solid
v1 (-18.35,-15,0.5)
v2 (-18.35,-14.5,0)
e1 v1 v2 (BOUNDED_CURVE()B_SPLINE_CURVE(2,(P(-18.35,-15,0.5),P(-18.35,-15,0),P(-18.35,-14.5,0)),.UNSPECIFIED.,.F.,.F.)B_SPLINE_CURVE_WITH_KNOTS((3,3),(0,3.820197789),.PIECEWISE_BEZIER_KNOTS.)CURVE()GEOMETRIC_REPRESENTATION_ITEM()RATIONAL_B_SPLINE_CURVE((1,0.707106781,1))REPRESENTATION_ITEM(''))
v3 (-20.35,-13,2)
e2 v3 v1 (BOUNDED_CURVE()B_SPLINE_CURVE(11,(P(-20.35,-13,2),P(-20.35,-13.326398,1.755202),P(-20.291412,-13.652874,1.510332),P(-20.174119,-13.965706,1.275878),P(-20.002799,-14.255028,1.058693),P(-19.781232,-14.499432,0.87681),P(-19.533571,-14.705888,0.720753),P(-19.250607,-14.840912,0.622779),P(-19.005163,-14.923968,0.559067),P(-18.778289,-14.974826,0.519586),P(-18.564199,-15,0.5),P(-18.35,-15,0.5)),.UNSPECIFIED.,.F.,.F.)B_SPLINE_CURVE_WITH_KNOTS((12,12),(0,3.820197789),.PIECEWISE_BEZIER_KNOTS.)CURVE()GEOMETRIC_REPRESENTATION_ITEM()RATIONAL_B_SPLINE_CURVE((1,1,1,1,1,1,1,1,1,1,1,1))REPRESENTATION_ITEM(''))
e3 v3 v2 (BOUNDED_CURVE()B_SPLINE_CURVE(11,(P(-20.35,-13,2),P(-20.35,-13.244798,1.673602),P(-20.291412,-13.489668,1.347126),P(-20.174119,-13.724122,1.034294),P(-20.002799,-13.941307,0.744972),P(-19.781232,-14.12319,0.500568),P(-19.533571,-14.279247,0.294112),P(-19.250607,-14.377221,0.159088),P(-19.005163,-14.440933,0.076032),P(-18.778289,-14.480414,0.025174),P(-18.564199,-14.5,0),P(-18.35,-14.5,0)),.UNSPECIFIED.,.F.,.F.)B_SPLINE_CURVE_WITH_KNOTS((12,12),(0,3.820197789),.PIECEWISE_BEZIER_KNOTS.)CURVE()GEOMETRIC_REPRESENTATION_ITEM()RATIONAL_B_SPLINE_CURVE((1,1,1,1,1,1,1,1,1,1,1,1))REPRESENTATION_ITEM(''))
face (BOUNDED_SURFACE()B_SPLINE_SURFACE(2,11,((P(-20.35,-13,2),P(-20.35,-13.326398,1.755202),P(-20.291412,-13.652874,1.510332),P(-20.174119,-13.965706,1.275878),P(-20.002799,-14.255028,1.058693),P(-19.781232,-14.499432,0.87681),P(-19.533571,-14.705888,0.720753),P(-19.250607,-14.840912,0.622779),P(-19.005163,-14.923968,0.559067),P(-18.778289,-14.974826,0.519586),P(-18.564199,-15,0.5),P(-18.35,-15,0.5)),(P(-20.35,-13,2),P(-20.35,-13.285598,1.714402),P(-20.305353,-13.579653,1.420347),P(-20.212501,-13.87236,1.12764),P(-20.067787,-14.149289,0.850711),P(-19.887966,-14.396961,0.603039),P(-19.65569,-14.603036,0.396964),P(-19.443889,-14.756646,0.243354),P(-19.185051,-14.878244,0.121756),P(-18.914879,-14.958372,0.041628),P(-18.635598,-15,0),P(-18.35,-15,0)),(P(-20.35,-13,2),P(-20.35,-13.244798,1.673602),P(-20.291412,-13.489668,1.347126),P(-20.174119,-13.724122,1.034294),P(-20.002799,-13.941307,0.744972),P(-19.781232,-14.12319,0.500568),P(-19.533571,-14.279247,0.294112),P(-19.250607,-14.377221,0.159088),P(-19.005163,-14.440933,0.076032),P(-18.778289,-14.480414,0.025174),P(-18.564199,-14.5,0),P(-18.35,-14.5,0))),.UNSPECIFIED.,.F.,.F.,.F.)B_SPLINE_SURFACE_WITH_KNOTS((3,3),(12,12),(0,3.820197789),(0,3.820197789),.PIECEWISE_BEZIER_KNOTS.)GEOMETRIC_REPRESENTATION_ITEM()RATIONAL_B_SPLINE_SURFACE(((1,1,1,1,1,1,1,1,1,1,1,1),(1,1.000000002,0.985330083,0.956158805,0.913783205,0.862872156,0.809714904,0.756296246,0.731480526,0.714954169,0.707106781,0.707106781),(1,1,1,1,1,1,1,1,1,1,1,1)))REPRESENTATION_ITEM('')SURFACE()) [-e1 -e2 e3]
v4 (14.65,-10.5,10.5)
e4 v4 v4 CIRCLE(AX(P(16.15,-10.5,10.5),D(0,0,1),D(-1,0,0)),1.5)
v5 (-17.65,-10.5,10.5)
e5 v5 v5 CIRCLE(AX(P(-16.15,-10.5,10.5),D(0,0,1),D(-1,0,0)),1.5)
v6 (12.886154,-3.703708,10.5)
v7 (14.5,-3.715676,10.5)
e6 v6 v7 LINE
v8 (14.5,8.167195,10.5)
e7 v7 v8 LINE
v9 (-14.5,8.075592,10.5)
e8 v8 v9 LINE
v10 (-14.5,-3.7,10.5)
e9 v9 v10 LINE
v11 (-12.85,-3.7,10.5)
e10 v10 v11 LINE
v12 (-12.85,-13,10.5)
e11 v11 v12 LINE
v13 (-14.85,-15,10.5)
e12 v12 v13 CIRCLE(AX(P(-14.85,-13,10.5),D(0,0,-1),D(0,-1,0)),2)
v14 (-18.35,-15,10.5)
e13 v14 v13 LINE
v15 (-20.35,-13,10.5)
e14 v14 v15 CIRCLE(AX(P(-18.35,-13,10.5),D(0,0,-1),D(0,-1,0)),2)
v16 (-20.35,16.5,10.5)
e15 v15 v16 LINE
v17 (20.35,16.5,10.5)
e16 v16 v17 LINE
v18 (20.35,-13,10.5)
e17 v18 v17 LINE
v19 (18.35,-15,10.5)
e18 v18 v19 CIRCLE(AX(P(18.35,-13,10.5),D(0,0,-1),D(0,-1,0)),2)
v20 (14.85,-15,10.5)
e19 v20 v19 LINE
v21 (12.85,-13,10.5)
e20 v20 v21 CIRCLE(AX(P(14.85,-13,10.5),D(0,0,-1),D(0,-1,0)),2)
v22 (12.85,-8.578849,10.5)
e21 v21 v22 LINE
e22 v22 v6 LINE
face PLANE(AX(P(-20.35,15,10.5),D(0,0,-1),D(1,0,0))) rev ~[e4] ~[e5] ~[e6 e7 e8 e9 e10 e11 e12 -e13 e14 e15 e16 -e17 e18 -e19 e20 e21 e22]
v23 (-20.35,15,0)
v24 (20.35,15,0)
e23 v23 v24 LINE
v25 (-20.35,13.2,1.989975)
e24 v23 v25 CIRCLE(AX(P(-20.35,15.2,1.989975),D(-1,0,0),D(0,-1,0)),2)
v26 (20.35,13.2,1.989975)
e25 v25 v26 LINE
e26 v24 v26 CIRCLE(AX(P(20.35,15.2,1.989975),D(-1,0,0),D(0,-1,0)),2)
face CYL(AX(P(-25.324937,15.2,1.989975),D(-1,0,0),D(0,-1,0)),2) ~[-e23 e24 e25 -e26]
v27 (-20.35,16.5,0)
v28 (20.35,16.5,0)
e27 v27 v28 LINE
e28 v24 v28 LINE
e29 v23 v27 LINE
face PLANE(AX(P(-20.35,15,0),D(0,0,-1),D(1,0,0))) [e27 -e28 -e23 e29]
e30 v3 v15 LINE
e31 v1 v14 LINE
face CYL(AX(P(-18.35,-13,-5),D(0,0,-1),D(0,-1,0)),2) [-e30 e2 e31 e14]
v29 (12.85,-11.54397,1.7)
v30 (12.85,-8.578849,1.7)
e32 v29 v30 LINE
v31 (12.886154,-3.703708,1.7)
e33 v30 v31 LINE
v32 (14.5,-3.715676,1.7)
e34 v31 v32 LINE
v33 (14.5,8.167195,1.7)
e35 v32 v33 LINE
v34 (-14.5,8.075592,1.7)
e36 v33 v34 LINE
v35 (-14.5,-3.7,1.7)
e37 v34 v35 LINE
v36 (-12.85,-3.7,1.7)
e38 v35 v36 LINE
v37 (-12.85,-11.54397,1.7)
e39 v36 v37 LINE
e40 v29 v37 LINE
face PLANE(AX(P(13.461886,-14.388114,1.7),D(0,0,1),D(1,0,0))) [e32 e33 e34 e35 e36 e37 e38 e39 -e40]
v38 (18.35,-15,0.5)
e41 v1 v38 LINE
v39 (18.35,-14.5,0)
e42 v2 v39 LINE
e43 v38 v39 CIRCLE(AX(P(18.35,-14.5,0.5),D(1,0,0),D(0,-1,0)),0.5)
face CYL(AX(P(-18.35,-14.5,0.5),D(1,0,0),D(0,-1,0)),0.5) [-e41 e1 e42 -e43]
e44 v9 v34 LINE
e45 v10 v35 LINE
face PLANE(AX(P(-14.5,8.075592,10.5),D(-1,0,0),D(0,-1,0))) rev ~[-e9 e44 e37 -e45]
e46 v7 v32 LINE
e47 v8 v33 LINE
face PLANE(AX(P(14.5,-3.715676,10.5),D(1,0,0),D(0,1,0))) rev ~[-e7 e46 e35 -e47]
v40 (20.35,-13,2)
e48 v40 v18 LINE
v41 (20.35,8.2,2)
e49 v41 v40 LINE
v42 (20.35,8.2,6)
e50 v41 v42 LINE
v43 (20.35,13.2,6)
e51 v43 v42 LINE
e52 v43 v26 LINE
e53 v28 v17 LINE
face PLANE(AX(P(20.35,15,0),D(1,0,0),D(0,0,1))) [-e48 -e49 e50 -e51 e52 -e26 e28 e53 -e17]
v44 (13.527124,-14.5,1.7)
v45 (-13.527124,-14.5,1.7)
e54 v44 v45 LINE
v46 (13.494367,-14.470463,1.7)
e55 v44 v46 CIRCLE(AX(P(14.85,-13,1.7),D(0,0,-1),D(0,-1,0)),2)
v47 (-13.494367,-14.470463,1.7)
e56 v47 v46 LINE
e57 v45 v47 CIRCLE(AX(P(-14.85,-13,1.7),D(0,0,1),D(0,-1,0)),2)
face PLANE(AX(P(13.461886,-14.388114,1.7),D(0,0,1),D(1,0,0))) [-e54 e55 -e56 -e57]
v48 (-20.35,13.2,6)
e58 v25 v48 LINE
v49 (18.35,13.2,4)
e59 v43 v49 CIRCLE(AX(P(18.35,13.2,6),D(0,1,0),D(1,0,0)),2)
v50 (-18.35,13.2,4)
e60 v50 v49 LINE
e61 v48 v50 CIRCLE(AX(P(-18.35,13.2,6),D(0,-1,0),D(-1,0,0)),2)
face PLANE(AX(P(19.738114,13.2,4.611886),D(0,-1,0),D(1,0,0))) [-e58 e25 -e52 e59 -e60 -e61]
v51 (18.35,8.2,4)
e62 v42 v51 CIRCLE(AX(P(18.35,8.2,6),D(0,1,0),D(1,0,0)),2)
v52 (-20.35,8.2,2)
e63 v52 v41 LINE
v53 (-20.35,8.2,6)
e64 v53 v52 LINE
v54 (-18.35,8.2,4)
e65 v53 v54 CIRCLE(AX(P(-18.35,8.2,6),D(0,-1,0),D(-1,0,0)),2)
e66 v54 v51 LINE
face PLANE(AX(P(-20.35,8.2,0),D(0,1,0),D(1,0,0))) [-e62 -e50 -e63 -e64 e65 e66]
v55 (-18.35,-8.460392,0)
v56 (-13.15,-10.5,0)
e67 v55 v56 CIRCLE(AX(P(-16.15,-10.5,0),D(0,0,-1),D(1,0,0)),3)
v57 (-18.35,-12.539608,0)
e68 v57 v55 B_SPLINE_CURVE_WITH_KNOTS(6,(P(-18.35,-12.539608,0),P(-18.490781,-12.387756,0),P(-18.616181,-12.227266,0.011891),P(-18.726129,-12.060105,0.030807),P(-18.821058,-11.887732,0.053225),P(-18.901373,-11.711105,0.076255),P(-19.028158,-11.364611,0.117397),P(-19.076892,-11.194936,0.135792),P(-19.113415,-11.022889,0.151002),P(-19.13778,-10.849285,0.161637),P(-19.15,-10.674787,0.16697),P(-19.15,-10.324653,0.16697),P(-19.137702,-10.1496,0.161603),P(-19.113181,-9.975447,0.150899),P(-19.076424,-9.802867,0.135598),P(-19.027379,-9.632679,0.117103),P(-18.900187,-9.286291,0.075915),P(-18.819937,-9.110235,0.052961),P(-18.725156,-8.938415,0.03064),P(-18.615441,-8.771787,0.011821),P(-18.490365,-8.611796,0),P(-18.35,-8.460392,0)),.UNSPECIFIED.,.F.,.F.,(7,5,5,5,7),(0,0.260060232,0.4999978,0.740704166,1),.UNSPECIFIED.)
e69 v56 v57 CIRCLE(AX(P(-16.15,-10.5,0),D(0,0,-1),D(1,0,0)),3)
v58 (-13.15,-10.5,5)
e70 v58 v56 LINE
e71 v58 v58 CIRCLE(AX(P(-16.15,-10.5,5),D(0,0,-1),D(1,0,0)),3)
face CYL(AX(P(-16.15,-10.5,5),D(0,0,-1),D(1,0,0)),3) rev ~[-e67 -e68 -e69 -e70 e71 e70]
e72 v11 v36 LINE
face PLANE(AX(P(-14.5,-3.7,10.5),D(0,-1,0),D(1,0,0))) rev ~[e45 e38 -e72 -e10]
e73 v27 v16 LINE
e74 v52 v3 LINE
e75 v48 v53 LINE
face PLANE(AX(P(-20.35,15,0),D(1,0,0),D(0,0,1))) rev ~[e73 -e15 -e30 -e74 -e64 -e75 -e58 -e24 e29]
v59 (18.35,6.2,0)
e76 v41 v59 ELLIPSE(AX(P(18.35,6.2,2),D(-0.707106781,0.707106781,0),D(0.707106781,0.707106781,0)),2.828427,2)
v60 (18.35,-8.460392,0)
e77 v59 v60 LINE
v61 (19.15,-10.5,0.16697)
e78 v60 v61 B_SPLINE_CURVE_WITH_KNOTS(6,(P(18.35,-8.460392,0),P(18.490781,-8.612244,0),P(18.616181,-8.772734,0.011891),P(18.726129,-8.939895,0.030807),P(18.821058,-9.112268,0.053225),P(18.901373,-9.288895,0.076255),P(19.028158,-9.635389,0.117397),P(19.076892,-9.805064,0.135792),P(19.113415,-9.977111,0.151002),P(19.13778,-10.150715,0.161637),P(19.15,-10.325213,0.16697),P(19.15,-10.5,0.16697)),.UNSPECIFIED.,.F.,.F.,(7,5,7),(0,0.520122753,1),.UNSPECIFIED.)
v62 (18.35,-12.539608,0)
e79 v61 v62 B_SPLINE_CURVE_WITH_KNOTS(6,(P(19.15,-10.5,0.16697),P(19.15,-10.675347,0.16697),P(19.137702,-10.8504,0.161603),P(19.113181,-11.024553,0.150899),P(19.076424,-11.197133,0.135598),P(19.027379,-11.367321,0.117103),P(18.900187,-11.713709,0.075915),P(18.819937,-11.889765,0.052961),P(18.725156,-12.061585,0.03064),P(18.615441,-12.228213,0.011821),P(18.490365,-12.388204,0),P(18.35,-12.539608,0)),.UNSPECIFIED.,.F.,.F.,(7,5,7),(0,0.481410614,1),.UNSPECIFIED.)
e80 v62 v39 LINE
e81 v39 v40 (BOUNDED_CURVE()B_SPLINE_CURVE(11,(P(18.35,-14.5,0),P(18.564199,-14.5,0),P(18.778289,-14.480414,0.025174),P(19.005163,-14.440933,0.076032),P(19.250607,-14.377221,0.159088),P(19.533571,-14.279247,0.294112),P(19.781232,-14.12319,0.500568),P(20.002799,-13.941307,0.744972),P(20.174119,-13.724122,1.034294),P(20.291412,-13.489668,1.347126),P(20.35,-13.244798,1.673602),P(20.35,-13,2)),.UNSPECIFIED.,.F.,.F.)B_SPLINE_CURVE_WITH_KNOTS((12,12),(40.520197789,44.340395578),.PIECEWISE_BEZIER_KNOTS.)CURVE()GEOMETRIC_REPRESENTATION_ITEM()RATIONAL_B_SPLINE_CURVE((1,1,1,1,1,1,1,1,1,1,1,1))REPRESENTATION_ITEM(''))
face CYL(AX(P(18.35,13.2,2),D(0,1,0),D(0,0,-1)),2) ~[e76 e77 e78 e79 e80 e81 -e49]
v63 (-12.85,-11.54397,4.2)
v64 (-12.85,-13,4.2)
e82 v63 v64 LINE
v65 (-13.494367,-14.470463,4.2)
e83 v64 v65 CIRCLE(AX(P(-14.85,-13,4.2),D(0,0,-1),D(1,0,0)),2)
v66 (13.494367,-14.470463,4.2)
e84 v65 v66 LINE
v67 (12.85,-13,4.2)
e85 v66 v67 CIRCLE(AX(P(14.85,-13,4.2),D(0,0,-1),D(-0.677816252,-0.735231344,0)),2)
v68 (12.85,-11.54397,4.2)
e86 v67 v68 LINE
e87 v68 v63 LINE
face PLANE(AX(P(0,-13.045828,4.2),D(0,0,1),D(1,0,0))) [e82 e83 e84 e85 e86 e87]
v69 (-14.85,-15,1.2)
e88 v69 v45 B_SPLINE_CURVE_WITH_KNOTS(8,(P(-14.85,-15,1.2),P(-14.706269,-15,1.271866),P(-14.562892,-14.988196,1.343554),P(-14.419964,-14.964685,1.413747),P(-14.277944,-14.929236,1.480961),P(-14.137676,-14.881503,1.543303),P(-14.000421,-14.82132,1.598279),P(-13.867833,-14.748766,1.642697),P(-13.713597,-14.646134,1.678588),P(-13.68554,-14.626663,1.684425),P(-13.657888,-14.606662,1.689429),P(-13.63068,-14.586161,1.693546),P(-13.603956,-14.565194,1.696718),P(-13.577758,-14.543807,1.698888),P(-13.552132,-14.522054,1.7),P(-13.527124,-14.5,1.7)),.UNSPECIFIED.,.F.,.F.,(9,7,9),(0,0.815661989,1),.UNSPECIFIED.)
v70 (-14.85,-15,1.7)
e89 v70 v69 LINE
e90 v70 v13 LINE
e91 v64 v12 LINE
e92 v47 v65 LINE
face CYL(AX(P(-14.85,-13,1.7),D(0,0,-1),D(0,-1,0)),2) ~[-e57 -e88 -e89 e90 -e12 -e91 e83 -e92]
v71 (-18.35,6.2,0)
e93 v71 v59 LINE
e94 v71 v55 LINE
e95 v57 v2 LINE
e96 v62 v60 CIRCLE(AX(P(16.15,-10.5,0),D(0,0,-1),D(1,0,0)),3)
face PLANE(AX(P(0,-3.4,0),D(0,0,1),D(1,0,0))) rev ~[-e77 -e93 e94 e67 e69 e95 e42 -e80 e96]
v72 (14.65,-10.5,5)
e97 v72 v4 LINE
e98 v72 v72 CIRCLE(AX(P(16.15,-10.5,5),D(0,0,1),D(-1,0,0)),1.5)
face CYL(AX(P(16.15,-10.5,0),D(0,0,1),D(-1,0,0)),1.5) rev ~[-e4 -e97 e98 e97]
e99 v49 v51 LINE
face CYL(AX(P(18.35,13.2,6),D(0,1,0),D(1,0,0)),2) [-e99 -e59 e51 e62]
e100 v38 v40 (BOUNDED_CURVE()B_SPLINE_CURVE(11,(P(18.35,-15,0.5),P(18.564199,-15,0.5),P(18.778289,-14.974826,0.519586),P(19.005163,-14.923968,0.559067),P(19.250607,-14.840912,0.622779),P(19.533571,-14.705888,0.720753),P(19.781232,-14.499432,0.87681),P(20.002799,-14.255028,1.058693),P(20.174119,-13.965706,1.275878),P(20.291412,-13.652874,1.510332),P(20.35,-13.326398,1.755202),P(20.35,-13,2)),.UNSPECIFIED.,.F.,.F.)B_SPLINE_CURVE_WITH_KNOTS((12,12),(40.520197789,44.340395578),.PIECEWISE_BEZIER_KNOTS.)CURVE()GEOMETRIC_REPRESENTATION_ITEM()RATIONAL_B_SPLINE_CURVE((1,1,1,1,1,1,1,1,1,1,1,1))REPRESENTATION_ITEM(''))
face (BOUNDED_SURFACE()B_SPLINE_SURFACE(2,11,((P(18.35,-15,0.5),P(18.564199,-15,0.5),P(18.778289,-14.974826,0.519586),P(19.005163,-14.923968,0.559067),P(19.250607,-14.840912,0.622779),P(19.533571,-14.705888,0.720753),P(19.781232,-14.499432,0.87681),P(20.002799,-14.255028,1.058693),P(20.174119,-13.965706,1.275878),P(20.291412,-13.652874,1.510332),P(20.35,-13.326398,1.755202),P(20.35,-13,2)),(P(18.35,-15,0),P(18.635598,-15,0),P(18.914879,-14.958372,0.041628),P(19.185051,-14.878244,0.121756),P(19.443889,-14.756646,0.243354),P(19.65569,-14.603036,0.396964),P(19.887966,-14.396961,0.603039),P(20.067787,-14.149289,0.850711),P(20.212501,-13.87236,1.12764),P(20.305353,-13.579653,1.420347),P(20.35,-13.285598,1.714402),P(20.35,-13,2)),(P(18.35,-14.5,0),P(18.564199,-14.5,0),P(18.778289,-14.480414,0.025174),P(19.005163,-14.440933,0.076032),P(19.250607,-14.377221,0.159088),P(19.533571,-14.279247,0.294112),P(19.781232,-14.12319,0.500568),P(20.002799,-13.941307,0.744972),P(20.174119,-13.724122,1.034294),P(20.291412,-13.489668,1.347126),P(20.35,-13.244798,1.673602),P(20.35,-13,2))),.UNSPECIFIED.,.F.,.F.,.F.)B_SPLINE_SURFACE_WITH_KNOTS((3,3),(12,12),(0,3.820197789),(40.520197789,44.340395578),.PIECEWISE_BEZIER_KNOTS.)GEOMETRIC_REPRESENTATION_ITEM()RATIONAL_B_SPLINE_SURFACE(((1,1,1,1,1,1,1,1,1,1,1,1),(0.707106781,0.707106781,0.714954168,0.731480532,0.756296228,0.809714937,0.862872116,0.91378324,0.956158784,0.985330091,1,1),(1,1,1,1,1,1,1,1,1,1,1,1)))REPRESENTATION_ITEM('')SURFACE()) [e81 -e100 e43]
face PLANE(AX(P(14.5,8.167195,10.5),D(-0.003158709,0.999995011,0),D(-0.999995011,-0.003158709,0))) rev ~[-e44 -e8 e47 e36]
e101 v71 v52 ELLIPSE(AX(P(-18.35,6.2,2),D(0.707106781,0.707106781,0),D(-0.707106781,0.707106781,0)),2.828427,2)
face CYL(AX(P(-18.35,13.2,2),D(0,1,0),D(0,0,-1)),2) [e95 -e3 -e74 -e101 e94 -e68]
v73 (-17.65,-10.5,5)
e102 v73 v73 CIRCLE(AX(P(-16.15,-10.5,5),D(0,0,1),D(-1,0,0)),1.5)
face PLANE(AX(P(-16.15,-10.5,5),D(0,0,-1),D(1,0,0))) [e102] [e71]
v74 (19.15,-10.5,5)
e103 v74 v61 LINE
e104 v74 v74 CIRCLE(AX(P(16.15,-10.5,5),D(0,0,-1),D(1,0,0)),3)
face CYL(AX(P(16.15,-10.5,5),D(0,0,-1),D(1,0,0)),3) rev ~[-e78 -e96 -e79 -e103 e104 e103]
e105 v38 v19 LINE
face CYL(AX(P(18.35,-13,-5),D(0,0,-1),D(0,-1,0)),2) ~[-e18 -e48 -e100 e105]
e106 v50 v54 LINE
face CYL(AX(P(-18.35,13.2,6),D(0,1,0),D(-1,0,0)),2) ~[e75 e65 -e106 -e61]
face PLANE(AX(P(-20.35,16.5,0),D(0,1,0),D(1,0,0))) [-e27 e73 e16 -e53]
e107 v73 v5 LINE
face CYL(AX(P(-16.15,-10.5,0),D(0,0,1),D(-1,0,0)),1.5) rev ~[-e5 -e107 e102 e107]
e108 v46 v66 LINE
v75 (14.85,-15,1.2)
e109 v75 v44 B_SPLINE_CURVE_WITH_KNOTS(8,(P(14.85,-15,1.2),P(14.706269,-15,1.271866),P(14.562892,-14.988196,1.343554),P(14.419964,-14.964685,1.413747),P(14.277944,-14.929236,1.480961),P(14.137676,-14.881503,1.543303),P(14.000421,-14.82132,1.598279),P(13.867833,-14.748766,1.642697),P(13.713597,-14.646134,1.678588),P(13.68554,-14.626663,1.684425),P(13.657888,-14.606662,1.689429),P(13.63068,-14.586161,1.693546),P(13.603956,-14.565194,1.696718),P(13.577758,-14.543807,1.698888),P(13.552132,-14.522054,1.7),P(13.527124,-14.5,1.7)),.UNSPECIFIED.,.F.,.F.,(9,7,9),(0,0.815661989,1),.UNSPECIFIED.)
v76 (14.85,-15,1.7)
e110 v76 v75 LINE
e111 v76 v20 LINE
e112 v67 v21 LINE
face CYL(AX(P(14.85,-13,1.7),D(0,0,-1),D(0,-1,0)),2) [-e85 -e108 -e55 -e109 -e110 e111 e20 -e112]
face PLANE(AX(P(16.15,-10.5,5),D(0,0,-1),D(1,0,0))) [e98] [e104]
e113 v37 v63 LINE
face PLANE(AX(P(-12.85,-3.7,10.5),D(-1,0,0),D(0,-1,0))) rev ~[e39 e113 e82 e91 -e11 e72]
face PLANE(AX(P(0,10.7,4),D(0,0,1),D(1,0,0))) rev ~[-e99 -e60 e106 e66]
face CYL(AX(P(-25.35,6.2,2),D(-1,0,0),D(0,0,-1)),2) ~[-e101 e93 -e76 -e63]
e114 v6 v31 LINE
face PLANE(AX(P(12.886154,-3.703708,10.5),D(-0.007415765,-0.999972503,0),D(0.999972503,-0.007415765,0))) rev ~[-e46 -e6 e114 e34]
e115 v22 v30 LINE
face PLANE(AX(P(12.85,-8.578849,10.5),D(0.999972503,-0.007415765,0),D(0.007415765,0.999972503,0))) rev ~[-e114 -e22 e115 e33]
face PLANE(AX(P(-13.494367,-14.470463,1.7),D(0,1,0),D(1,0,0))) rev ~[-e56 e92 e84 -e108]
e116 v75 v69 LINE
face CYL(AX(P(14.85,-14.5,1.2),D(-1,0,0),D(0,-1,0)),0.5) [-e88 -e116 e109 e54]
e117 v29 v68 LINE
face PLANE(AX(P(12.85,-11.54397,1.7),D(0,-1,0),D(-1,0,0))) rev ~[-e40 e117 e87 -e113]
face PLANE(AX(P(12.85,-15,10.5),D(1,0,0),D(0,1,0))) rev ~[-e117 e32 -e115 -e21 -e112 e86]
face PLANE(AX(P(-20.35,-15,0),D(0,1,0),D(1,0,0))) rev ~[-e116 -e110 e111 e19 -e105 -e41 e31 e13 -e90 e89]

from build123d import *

# Parameters (mm, degrees)
F0_W           = 40.7
F0_H           = 23.2
F0_H_2         = 5
F0_H_3         = 1.8
F1_DEPTH       = 10.5
F2_D           = 3
F2_CBORE_D     = 6
F2_CBORE_DEPTH = 5
F3_D           = 3
F3_CBORE_D     = 6
F3_CBORE_DEPTH = 5
F4_DEPTH       = 4
F6_DEPTH       = 8.8
F7_T1_DEPTH    = 13.8
F7_T3_DEPTH    = 20.5
F7_T5_DEPTH    = 33.2
F7_T7_DEPTH    = 50.6498743711
F7_T9_DEPTH    = 50.7
F7_T11_DEPTH   = 5
F8_R           = 0.5
F10_DEPTH      = 2.5
F11_DEPTH      = 1.5


# Not quite as in the source:
# - a fillet or chamfer that OpenCascade refuses, or shapes differently, is made with other operations: its cross-section is extruded or revolved along the edge and cut away or added


with BuildPart() as f1:
    # F0 (on Top) → F1 (new body)
    with BuildSketch(Plane.XY):
        with Locations((0, -3.4)):
            Rectangle(F0_W, F0_H)
        with Locations((0, 10.7)):
            Rectangle(F0_W, F0_H_2)
        with Locations((0, 14.1)):
            Rectangle(F0_W, F0_H_3)
    extrude(amount=F1_DEPTH)

    # F2 (through all)
    with Locations(Plane(origin=(0, 0, 0), x_dir=(1, 0, 0), z_dir=(0, 0, -1))):
        with Locations((-16.15, 10.5)):
            CounterBoreHole(F2_D / 2, F2_CBORE_D / 2, F2_CBORE_DEPTH)

    # F3 (through all)
    with Locations(Plane(origin=(0, 0, 0), x_dir=(1, 0, 0), z_dir=(0, 0, -1))):
        with Locations((16.15, 10.5)):
            CounterBoreHole(F3_D / 2, F3_CBORE_D / 2, F3_CBORE_DEPTH)

    # F0 (on Top) → F4 (cut)
    with BuildSketch(Plane.XY):
        with Locations((0, 10.7)):
            Rectangle(F0_W, F0_H_2)
    extrude(amount=F4_DEPTH, mode=Mode.SUBTRACT)

    # F5 (on face) → F6 (cut)
    with BuildSketch(Plane.XY.offset(10.5)):
        Polygon((-12.85, -3.7), (-12.85, -8.6720474064), (-12.85, -15), (12.85, -15), (12.85, -8.5788490251), (12.886153895, -3.7037077804), (14.5, -3.7156760127), (14.5, 8.1671951339), (-14.5, 8.0755921081), (-14.5, -3.7), align=None)
    extrude(amount=-F6_DEPTH, mode=Mode.SUBTRACT)

    # F7: fillet of radius 2 on 10 edges, made by hand

    # F7_s2 → F7_t1 (cut)
    with BuildSketch(Plane.XY.offset(1.7)):
        with BuildLine():
            ThreePointArc((-14.85, -15), (-13.4357864376, -14.4142135624), (-12.85, -13))
            Line((-12.85, -13), (-12.85, -15))
            Line((-12.85, -15), (-14.85, -15))
        make_face()
        with BuildLine():
            ThreePointArc((14.85, -15), (13.4357864376, -14.4142135624), (12.85, -13))
            Line((12.85, -13), (12.85, -15))
            Line((12.85, -15), (14.85, -15))
        make_face()
    extrude(amount=F7_T1_DEPTH, mode=Mode.SUBTRACT)

    # F7_s4 → F7_t3 (cut)
    with BuildSketch(Plane.XY.offset(-5)):
        with BuildLine():
            ThreePointArc((-18.35, -15), (-19.7642135624, -14.4142135624), (-20.35, -13))
            Line((-20.35, -13), (-20.35, -15))
            Line((-20.35, -15), (-18.35, -15))
        make_face()
        with BuildLine():
            ThreePointArc((18.35, -15), (19.7642135624, -14.4142135624), (20.35, -13))
            Line((20.35, -13), (20.35, -15))
            Line((20.35, -15), (18.35, -15))
        make_face()
    extrude(amount=F7_T3_DEPTH, mode=Mode.SUBTRACT)

    # F7_s6 → F7_t5 (cut)
    with BuildSketch(Plane.XZ.offset(-13.2)):
        with BuildLine():
            ThreePointArc((-18.35, 0), (-19.7642135624, 0.5857864376), (-20.35, 2))
            Line((-20.35, 2), (-20.35, 0))
            Line((-20.35, 0), (-18.35, 0))
        make_face()
        with BuildLine():
            ThreePointArc((18.35, 0), (19.7642135624, 0.5857864376), (20.35, 2))
            Line((20.35, 2), (20.35, 0))
            Line((20.35, 0), (18.35, 0))
        make_face()
    extrude(amount=F7_T5_DEPTH, mode=Mode.SUBTRACT)

    # F7_s8 → F7_t7 (cut)
    with BuildSketch(Plane.YZ.offset(-25.3249371855)):
        with BuildLine():
            ThreePointArc((13.2, 1.9899748742), (13.7167603026, 0.6483340877), (15, 0))
            Line((15, 0), (13.2, 0))
            Line((13.2, 0), (13.2, 1.9899748742))
        make_face()
    extrude(amount=F7_T7_DEPTH, mode=Mode.SUBTRACT)

    # F7_s10 → F7_t9 (cut)
    with BuildSketch(Plane.YZ.offset(-25.35)):
        with BuildLine():
            ThreePointArc((6.2, 0), (7.6142135624, 0.5857864376), (8.2, 2))
            Line((8.2, 2), (8.2, 0))
            Line((8.2, 0), (6.2, 0))
        make_face()
    extrude(amount=F7_T9_DEPTH, mode=Mode.SUBTRACT)

    # F7_s12 → F7_t11 (cut)
    with BuildSketch(Plane.XZ.offset(-13.2)):
        with BuildLine():
            ThreePointArc((20.35, 6), (19.7642135624, 4.5857864376), (18.35, 4))
            Line((18.35, 4), (20.35, 4))
            Line((20.35, 4), (20.35, 6))
        make_face()
        with BuildLine():
            ThreePointArc((-20.35, 6), (-19.7642135624, 4.5857864376), (-18.35, 4))
            Line((-18.35, 4), (-20.35, 4))
            Line((-20.35, 4), (-20.35, 6))
        make_face()
    extrude(amount=F7_T11_DEPTH, mode=Mode.SUBTRACT)

    # F8
    f8_edges = [f1.edges().sort_by_distance(p)[0] for p in [
        (0, -15, 0),
        (0, -15, 1.7),
        (-19.764214, -14.414214, 0.585786),
        (19.764214, -14.414214, 0.585786),
    ]]
    fillet(f8_edges, radius=F8_R)

    # F9 (on face) → F10 (join)
    with BuildSketch(Plane.XY.offset(1.7)):
        with BuildLine():
            Line((12.85, -11.5439696237), (-12.85, -11.5439696237))
            Line((-12.85, -11.5439696237), (-12.85, -13))
            ThreePointArc((-12.85, -13), (-13.0181614416, -13.802725044), (-13.4943674962, -14.4704626873))
            Line((-13.4943674962, -14.4704626873), (13.4943674962, -14.4704626873))
            ThreePointArc((13.4943674962, -14.4704626873), (13.0181614416, -13.802725044), (12.85, -13))
            Line((12.85, -13), (12.85, -11.5439696237))
        make_face()
    extrude(amount=F10_DEPTH)

    # F11 (add): a face of the model
    f11_faces = [f1.faces().sort_by_distance(p)[0] for p in [
        (0, 15, 5.25),
    ]]
    extrude(f11_faces, amount=F11_DEPTH)


solid = f1.part
